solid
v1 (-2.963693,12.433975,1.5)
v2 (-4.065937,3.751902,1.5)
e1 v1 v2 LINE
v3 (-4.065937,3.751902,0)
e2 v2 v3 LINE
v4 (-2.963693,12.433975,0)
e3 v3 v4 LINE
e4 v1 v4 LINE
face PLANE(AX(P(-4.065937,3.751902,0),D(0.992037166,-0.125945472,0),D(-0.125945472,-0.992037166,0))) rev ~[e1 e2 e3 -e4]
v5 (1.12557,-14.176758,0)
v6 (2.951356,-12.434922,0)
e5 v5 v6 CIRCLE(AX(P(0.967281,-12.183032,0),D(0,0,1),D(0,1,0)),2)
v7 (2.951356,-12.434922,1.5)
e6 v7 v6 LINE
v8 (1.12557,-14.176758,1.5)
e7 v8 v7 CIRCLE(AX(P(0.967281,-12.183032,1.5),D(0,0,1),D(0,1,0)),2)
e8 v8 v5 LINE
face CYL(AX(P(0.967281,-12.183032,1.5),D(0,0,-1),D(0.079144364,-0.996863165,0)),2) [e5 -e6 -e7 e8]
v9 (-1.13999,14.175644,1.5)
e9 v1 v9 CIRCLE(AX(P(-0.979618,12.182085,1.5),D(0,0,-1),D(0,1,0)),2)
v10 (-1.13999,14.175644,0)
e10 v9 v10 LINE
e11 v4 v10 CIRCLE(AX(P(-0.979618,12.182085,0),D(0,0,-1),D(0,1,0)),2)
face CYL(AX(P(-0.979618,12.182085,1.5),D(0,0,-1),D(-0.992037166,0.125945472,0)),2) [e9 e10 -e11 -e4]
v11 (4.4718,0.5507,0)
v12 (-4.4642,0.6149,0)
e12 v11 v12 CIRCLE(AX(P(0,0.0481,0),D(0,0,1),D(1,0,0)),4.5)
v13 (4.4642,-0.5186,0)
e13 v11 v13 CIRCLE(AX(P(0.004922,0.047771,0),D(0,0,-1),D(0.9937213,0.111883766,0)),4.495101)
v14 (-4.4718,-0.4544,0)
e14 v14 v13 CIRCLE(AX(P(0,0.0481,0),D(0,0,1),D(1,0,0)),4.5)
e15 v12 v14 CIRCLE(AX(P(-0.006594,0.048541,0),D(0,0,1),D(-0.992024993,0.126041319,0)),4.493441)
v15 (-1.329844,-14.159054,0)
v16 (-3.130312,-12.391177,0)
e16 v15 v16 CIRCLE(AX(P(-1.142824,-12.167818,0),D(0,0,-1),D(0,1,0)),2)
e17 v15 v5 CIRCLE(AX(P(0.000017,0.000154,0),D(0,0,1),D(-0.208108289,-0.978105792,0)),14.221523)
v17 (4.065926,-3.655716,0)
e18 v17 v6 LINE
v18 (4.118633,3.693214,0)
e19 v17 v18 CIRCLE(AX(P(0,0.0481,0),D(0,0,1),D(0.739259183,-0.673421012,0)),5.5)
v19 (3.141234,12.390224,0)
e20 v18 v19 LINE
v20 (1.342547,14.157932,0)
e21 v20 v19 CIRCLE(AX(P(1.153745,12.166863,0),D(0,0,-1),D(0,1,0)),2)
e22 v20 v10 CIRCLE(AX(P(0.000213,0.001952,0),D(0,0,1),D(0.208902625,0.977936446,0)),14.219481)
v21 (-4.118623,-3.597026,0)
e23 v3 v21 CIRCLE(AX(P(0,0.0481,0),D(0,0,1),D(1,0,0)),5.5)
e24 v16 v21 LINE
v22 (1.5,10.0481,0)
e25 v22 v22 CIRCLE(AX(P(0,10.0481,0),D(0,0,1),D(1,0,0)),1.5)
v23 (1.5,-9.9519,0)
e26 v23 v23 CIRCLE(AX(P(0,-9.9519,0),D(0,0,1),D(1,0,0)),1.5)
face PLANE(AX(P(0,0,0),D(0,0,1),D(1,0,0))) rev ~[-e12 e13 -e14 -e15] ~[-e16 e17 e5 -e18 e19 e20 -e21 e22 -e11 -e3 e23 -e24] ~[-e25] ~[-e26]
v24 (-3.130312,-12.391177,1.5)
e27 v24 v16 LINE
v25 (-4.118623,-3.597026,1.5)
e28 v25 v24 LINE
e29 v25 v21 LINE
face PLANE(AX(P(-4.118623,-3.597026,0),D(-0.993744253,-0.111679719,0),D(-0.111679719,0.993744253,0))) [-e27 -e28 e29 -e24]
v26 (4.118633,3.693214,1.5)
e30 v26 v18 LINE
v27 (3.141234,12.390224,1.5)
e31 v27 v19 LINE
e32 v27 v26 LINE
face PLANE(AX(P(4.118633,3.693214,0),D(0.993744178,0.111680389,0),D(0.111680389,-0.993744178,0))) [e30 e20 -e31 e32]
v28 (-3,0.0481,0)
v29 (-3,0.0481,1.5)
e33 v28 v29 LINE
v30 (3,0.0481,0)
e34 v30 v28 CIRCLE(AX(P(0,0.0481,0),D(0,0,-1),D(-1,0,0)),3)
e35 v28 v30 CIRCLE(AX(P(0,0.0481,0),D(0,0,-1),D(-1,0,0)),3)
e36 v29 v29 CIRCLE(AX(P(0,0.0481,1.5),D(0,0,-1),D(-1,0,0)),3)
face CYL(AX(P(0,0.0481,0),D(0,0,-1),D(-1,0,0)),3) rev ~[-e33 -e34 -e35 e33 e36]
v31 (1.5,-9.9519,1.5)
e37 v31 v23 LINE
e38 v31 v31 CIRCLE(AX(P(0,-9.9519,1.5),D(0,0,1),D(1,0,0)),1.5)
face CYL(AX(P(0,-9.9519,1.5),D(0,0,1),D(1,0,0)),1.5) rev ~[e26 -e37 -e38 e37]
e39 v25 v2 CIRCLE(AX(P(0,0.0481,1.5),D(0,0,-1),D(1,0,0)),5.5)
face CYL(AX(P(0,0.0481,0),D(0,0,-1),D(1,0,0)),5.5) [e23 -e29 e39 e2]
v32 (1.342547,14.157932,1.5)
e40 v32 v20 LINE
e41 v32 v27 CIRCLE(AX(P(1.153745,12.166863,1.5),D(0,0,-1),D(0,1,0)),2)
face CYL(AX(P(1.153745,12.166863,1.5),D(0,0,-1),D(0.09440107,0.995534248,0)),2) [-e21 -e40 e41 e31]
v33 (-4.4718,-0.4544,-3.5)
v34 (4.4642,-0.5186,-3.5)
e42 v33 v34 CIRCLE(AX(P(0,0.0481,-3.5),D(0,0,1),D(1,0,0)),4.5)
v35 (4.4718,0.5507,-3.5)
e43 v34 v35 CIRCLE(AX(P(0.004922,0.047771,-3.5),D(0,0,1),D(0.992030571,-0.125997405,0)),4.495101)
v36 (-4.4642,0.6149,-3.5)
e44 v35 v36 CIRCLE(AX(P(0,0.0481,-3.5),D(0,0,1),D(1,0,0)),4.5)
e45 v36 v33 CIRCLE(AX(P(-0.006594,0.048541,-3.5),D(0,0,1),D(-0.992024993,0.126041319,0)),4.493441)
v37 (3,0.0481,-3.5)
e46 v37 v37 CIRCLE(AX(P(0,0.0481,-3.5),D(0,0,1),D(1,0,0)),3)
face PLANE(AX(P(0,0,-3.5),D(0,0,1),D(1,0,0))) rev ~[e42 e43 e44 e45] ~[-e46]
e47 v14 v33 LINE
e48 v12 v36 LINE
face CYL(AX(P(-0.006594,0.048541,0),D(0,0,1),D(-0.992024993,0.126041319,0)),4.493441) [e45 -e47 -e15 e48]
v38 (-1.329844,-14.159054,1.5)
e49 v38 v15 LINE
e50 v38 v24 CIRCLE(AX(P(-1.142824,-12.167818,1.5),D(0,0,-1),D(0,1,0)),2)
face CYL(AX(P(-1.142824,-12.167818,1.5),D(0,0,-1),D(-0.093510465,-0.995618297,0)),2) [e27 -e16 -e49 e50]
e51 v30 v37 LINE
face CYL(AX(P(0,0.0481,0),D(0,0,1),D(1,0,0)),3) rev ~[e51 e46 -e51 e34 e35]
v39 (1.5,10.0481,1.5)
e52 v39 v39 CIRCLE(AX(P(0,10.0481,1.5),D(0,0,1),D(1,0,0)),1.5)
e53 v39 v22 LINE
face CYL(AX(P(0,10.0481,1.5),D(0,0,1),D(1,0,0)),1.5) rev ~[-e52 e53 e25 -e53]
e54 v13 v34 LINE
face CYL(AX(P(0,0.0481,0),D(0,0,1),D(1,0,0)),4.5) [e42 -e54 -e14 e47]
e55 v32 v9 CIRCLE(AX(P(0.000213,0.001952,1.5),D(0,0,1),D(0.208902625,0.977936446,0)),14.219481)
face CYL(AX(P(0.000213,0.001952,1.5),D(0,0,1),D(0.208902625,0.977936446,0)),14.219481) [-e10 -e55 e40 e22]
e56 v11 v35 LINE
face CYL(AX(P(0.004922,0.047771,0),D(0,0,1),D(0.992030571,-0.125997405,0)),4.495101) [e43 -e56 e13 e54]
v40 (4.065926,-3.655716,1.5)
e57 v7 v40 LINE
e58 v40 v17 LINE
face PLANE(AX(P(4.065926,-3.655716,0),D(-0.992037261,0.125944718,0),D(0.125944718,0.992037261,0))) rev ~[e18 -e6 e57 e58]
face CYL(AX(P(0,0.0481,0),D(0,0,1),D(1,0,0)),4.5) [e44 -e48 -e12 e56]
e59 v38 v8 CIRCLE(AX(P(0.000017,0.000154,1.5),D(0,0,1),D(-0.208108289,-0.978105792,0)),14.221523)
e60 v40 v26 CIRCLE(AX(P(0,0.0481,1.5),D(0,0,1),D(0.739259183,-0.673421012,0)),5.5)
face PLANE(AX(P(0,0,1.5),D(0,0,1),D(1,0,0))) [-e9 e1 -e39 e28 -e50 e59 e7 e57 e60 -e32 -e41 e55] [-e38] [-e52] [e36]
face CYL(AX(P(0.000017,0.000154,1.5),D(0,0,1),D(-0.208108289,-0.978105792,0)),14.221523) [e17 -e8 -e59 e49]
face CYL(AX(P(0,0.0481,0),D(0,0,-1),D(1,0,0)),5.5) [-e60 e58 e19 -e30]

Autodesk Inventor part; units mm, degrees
ref_plane "YZ Plane" through (0, 0, 0) normal (1, 0, 0) x (0, 1, 0)
ref_plane "XZ Plane" through (0, 0, 0) normal (0, 1, 0) x (-1, 0, 0)
ref_plane "XY Plane" through (0, 0, 0) normal (0, 0, 1) x (1, 0, 0)
sketch "Sketch1" plane through (0, 0, 0) normal (0, 0, 1) x (1, 0, 0)
  circle A0 centre (0, 0.0481) radius 3
  circle A1 centre (0, 0.0481) radius 1.5
  circle A2 centre (0, 0.0481) radius 5.5
  arc A3 (2.6218, 17.0122) -> (-2.3779, 17.0481) centre (0.1221, 17.0481) ccw
  line L0 (0.1221, 17.0481) -> (-2.3779, 17.0481) construction
  line L1 (0.1221, 17.0481) -> (2.6221, 17.0481) construction
  line L2 (2.6221, 17.0481) -> (0.1221, 17.0481) construction
  line L3 (-2.3779, 17.0481) -> (-4.4642, 0.6149)
  line L4 (0.1221, 17.0481) -> (0, 0.0481) construction
  line L5 (2.6218, 17.0122) -> (4.4718, 0.5507)
  line L6 (0, 0.0481) -> (-9.4947, 0.1163) construction
  arc A4 (-2.6218, -16.916) -> (2.3779, -16.9519) centre (-0.1221, -16.9519) ccw
  line L7 (-2.6218, -16.916) -> (-4.4718, -0.4544)
  line L8 (2.3779, -16.9519) -> (4.4642, -0.5186)
  arc A5 (-4.4642, 0.6149) -> (-4.4718, -0.4544) centre (0, 0.0481) ccw
  arc A6 (4.4642, -0.5186) -> (4.4718, 0.5507) centre (0, 0.0481) ccw
  circle A7 centre (0, 0.0481) radius 4.5
  dimension "d1" = 3
  dimension "d2" = 6
  dimension "d4" = 11
  dimension "d5" = 5
  dimension "d6" = 17
  dimension "d8" = 16.5652
  dimension "d9" = 16.5652
  dimension "d10" = 97.235
  dimension "d20" = 13.9277
extrude "Extrusion1" add sketch "Sketch1" along normal blind 1.5 contours L5 A7 L3 A2 | A2 L3 A3 L5 | L8 A4 L7 A2 | A2 L7 A7 L8 | A6 A7 A5
extrude "Extrusion2" add sketch "Sketch1" along normal blind 1.5 contours A2 L8 A6 L5 | L5 A7 L3 A2 | A2 L7 A7 L8 | L3 A5 L7 A2 | A6 A7 A5
extrude "Extrusion3" add sketch "Sketch1" against normal blind 3.5 contours A6 A7 A5
extrude "Extrusion4" add sketch "Sketch1" along normal blind 1.5 contours A0
sketch "Sketch2" plane through (0, 0, 1.5) normal (0, 0, 1) x (1, 0, 0)
  circle A0 centre (0, 0.0481) radius 3 projected
  circle A1 centre (0, 10.0481) radius 1.5
  circle A2 centre (0, -9.9519) radius 1.5
  dimension "d25" = 3
  dimension "d26" = 3
  dimension "d29" = 10
  dimension "d30" = 10
extrude "Extrusion5" cut sketch "Sketch2" against normal blind 2 contours A1 | A2
sketch "Sketch3" plane through (0, 0.0481, 0) normal (0, 0, -1) x (-1, 0, 0)
  circle A0 centre (0, 0) radius 1.5 projected
  circle A1 centre (0, 0) radius 3 projected
  point P0 (0, -0.0481)
extrude "Extrusion6" cut sketch "Sketch3" against normal up to next
sketch "Sketch4" plane through (0, 0, 1.5) normal (0, 0, 1) x (1, 0, 0)
  circle A0 centre (0, -9.9519) radius 1.5 projected
  circle A1 centre (0, 10.0481) radius 1.5 projected
  line L0 (2.6218, 17.0122) -> (4.1187, 3.6932) projected
  arc A2 (2.6218, 17.0122) -> (-2.3779, 17.0481) centre (0.1221, 17.0481) ccw projected
  line L1 (-4.0659, 3.752) -> (-2.3779, 17.0481) projected
  line L2 (-2.6218, -16.916) -> (-4.1187, -3.5969) projected
  arc A3 (-2.6218, -16.916) -> (2.3779, -16.9519) centre (-0.1221, -16.9519) ccw projected
  line L3 (4.0659, -3.6557) -> (2.3779, -16.9519) projected
  line L4 (0.1221, 17.0481) -> (0, 10.0481) construction
  line L5 (0, -9.9519) -> (-0.1221, -16.9519) construction
  arc A4 (-2.9596, -13.91) -> (2.7589, -13.9512) centre (0, 0) ccw
  arc A5 (2.9707, 13.9077) -> (-2.7714, 13.9487) centre (0, 0) ccw
extrude "Extrusion7" cut sketch "Sketch4" against normal up to next contours L0 A5 L1 A2 | L2 A4 L3 A3
fillet "Fillet1" radius 2 4 edges at (2.7589, -13.9512, 0.75) (-2.9596, -13.91, 0.75) (2.9707, 13.9077, 0.75) (-2.7714, 13.9487, 0.75)
properties part number "acople para eje falso"
